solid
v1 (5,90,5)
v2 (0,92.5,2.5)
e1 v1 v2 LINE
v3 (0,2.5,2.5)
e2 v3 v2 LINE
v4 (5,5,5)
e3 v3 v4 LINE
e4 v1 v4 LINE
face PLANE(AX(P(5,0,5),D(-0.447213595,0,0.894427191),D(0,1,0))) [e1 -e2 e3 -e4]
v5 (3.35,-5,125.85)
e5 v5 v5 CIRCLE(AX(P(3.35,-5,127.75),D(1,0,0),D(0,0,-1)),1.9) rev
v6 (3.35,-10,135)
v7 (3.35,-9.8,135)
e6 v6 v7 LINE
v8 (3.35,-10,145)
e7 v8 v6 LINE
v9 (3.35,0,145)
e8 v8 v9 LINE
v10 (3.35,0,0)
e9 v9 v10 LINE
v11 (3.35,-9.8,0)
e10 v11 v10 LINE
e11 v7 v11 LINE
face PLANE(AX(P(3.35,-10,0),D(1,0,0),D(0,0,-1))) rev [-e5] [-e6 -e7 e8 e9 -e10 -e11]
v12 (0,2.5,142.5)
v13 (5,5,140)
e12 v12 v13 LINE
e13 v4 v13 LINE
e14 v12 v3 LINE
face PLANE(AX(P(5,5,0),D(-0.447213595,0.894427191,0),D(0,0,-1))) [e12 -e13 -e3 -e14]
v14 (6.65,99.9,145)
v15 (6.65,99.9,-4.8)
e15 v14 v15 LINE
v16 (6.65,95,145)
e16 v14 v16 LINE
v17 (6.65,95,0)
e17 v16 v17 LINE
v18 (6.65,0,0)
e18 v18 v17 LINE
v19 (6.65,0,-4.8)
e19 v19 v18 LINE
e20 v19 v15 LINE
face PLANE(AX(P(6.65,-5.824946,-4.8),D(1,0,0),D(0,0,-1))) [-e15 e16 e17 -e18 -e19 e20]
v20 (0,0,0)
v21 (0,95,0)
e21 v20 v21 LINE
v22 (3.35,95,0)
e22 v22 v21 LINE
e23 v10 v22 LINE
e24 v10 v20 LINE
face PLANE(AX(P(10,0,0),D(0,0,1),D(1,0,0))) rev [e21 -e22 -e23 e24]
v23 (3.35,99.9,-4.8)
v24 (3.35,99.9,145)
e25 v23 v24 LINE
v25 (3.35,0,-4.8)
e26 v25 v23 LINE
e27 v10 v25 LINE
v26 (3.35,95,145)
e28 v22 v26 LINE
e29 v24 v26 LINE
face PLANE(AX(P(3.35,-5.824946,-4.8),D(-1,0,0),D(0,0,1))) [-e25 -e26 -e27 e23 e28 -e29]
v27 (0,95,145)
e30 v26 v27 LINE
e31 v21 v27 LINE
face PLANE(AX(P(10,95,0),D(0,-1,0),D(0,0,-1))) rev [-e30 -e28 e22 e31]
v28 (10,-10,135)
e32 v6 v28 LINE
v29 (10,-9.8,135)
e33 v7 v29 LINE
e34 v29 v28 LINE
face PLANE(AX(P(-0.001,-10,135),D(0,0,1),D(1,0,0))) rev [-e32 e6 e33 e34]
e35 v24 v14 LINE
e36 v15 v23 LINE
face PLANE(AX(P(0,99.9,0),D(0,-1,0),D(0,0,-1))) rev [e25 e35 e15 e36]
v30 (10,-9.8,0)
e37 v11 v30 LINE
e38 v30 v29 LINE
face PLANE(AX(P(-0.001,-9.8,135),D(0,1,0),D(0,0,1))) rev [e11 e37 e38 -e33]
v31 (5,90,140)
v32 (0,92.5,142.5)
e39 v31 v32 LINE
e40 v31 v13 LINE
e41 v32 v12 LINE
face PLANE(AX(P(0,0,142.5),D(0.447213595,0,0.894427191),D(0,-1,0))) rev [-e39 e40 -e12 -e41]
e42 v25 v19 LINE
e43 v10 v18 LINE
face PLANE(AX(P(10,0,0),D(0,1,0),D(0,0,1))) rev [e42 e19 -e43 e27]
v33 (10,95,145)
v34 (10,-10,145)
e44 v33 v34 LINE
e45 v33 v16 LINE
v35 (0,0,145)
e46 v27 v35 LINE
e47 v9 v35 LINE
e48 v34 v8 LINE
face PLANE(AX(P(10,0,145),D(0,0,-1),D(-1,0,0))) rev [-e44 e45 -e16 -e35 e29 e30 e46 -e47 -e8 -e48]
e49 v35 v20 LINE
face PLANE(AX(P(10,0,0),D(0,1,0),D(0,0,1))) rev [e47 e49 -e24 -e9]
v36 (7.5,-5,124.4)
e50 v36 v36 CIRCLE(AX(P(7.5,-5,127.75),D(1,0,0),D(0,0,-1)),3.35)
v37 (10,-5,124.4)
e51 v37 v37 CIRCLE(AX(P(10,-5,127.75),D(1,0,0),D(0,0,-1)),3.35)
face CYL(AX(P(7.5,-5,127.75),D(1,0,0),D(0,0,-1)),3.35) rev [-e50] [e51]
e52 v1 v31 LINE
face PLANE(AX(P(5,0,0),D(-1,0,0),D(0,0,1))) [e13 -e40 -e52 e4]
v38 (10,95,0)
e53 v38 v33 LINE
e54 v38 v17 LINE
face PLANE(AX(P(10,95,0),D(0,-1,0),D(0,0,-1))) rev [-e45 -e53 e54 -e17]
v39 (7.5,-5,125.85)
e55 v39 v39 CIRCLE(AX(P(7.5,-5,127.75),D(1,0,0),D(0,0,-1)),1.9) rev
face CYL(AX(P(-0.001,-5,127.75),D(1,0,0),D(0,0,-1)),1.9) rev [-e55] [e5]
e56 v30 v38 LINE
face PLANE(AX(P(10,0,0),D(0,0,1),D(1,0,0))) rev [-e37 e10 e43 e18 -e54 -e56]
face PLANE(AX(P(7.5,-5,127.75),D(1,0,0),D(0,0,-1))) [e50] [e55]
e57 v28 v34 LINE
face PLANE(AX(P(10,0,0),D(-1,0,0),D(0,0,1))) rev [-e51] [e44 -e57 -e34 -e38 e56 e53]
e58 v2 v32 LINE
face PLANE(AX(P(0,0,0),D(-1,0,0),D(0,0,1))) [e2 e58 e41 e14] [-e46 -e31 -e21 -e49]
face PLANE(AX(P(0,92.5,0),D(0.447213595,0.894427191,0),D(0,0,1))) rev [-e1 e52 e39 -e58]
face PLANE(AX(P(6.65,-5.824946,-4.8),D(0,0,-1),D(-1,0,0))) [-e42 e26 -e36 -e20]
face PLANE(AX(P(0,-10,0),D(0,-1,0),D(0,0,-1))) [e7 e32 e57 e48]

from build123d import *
from OCP.BRepFilletAPI import BRepFilletAPI_MakeChamfer

# Parameters (mm, degrees)
SKETCH2_W           = 95
SKETCH2_H           = 145
BOSS_EXTRUDE1_DEPTH = 10
SKETCH3_W           = 3.3
SKETCH3_H           = 4.8
BOSS_EXTRUDE3_DEPTH = 95
SKETCH4_W           = 3.3
SKETCH4_H           = 149.8
BOSS_EXTRUDE4_DEPTH = 4.9
BOSS_EXTRUDE5_DEPTH = 10
CUT_EXTRUDE1_REACH  = 178.366
SKETCH6_R           = 1.9
SKETCH8_R           = 3.35
CUT_EXTRUDE3_DEPTH  = 2.5
CUT_EXTRUDE2_REACH  = 178.366
SKETCH7_W           = 0.2
SKETCH7_H           = 135
SKETCH9_W           = 85
SKETCH9_H           = 135
CUT_EXTRUDE4_DEPTH  = 5
CHAMFER1_SIZE       = 2.5
CHAMFER1_SIZE_2     = 5


with BuildPart() as part:
    # Sketch2 → Boss-Extrude1 (new body)
    with BuildSketch(Plane.YZ):
        with Locations((47.5, 72.5)):
            Rectangle(SKETCH2_W, SKETCH2_H)
    extrude(amount=BOSS_EXTRUDE1_DEPTH)

    # Sketch3 → Boss-Extrude3 (add)
    with BuildSketch(Plane(origin=(0, 95, 0), x_dir=(-1, 0, 0), z_dir=(0, 1, 0))):
        with Locations((-5, -2.4)):
            Rectangle(SKETCH3_W, SKETCH3_H)
    extrude(amount=-BOSS_EXTRUDE3_DEPTH)

    # Sketch4 → Boss-Extrude4 (add)
    with BuildSketch(Plane(origin=(0, 95, 0), x_dir=(-1, 0, 0), z_dir=(0, 1, 0))):
        with Locations((-5, 70.1)):
            Rectangle(SKETCH4_W, SKETCH4_H)
    extrude(amount=BOSS_EXTRUDE4_DEPTH)

    # Sketch5 → Boss-Extrude5 (add)
    with BuildSketch(Plane.XZ):
        Polygon((10, 145), (3.35, 145), (3.35, 0), (6.65, 0), (10, 0), align=None)
    extrude(amount=BOSS_EXTRUDE5_DEPTH)

    # Sketch6 → Cut-Extrude1 (cut, up to next)
    with BuildSketch(Plane.YZ.offset(10), mode=Mode.PRIVATE) as cut_extrude1_sk1:
        with Locations(Location((-5, 127.75, 0), (0, 0, 270))):
            Circle(SKETCH6_R)
    cut_extrude1_tool1 = extrude(cut_extrude1_sk1.sketch, amount=-CUT_EXTRUDE1_REACH, mode=Mode.PRIVATE) & part.part
    add(cut_extrude1_tool1.solids().sort_by_distance((10, -5, 127.75))[0], mode=Mode.SUBTRACT)

    # Sketch8 → Cut-Extrude3 (cut)
    with BuildSketch(Plane.YZ.offset(10)):
        with Locations(Location((-5, 127.75, 0), (0, 0, 270))):
            Circle(SKETCH8_R)
    extrude(amount=-CUT_EXTRUDE3_DEPTH, mode=Mode.SUBTRACT)

    # Sketch7 → Cut-Extrude2 (cut, up to next)
    with BuildSketch(Plane.YZ.offset(10), mode=Mode.PRIVATE) as cut_extrude2_sk1:
        with Locations((-9.9, 67.5)):
            Rectangle(SKETCH7_W, SKETCH7_H)
    cut_extrude2_tool1 = extrude(cut_extrude2_sk1.sketch, amount=-CUT_EXTRUDE2_REACH, mode=Mode.PRIVATE) & part.part
    add(cut_extrude2_tool1.solids().sort_by_distance((10, -9.9, 67.5))[0], mode=Mode.SUBTRACT)

    # Sketch9 → Cut-Extrude4 (cut)
    with BuildSketch(Plane(origin=(0, 0, 0), x_dir=(0, -1, 0), z_dir=(-1, 0, 0))):
        with Locations((-47.5, 72.5)):
            Rectangle(SKETCH9_W, SKETCH9_H)
    extrude(amount=-CUT_EXTRUDE4_DEPTH, mode=Mode.SUBTRACT)

    # Chamfer1
    chamfer1_edges_1 = [part.edges().sort_by_distance(p)[0] for p in [
        (0, 47.5, 5),
    ]]
    chamfer1_side_1 = [part.faces().sort_by_distance(p)[0] for p in [
        (0, 47.5, 4.95),
    ]]
    chamfer1_edges_2 = [part.edges().sort_by_distance(p)[0] for p in [
        (0, 5, 72.5),
    ]]
    chamfer1_side_2 = [part.faces().sort_by_distance(p)[0] for p in [
        (0, 4.95, 72.5),
    ]]
    chamfer1_edges_3 = [part.edges().sort_by_distance(p)[0] for p in [
        (0, 90, 72.5),
    ]]
    chamfer1_side_3 = [part.faces().sort_by_distance(p)[0] for p in [
        (0, 90.05, 72.5),
    ]]
    chamfer1_edges_4 = [part.edges().sort_by_distance(p)[0] for p in [
        (0, 47.5, 140),
    ]]
    chamfer1_side_4 = [part.faces().sort_by_distance(p)[0] for p in [
        (0, 47.5, 140.05),
    ]]
    chamfer1 = BRepFilletAPI_MakeChamfer(part.part.solid().wrapped)
    for e in chamfer1_edges_1:
        chamfer1.Add(CHAMFER1_SIZE - 0.0001, CHAMFER1_SIZE_2 - 0.0001, e.wrapped, chamfer1_side_1[0].wrapped)
    for e in chamfer1_edges_2:
        chamfer1.Add(CHAMFER1_SIZE - 0.0001, CHAMFER1_SIZE_2 - 0.0001, e.wrapped, chamfer1_side_2[0].wrapped)
    for e in chamfer1_edges_3:
        chamfer1.Add(CHAMFER1_SIZE - 0.0001, CHAMFER1_SIZE_2 - 0.0001, e.wrapped, chamfer1_side_3[0].wrapped)
    for e in chamfer1_edges_4:
        chamfer1.Add(CHAMFER1_SIZE - 0.0001, CHAMFER1_SIZE_2 - 0.0001, e.wrapped, chamfer1_side_4[0].wrapped)
    add(Compound.cast(chamfer1.Shape()), mode=Mode.REPLACE)  # a hair under: the kernel refuses the full size


solid = part.part
